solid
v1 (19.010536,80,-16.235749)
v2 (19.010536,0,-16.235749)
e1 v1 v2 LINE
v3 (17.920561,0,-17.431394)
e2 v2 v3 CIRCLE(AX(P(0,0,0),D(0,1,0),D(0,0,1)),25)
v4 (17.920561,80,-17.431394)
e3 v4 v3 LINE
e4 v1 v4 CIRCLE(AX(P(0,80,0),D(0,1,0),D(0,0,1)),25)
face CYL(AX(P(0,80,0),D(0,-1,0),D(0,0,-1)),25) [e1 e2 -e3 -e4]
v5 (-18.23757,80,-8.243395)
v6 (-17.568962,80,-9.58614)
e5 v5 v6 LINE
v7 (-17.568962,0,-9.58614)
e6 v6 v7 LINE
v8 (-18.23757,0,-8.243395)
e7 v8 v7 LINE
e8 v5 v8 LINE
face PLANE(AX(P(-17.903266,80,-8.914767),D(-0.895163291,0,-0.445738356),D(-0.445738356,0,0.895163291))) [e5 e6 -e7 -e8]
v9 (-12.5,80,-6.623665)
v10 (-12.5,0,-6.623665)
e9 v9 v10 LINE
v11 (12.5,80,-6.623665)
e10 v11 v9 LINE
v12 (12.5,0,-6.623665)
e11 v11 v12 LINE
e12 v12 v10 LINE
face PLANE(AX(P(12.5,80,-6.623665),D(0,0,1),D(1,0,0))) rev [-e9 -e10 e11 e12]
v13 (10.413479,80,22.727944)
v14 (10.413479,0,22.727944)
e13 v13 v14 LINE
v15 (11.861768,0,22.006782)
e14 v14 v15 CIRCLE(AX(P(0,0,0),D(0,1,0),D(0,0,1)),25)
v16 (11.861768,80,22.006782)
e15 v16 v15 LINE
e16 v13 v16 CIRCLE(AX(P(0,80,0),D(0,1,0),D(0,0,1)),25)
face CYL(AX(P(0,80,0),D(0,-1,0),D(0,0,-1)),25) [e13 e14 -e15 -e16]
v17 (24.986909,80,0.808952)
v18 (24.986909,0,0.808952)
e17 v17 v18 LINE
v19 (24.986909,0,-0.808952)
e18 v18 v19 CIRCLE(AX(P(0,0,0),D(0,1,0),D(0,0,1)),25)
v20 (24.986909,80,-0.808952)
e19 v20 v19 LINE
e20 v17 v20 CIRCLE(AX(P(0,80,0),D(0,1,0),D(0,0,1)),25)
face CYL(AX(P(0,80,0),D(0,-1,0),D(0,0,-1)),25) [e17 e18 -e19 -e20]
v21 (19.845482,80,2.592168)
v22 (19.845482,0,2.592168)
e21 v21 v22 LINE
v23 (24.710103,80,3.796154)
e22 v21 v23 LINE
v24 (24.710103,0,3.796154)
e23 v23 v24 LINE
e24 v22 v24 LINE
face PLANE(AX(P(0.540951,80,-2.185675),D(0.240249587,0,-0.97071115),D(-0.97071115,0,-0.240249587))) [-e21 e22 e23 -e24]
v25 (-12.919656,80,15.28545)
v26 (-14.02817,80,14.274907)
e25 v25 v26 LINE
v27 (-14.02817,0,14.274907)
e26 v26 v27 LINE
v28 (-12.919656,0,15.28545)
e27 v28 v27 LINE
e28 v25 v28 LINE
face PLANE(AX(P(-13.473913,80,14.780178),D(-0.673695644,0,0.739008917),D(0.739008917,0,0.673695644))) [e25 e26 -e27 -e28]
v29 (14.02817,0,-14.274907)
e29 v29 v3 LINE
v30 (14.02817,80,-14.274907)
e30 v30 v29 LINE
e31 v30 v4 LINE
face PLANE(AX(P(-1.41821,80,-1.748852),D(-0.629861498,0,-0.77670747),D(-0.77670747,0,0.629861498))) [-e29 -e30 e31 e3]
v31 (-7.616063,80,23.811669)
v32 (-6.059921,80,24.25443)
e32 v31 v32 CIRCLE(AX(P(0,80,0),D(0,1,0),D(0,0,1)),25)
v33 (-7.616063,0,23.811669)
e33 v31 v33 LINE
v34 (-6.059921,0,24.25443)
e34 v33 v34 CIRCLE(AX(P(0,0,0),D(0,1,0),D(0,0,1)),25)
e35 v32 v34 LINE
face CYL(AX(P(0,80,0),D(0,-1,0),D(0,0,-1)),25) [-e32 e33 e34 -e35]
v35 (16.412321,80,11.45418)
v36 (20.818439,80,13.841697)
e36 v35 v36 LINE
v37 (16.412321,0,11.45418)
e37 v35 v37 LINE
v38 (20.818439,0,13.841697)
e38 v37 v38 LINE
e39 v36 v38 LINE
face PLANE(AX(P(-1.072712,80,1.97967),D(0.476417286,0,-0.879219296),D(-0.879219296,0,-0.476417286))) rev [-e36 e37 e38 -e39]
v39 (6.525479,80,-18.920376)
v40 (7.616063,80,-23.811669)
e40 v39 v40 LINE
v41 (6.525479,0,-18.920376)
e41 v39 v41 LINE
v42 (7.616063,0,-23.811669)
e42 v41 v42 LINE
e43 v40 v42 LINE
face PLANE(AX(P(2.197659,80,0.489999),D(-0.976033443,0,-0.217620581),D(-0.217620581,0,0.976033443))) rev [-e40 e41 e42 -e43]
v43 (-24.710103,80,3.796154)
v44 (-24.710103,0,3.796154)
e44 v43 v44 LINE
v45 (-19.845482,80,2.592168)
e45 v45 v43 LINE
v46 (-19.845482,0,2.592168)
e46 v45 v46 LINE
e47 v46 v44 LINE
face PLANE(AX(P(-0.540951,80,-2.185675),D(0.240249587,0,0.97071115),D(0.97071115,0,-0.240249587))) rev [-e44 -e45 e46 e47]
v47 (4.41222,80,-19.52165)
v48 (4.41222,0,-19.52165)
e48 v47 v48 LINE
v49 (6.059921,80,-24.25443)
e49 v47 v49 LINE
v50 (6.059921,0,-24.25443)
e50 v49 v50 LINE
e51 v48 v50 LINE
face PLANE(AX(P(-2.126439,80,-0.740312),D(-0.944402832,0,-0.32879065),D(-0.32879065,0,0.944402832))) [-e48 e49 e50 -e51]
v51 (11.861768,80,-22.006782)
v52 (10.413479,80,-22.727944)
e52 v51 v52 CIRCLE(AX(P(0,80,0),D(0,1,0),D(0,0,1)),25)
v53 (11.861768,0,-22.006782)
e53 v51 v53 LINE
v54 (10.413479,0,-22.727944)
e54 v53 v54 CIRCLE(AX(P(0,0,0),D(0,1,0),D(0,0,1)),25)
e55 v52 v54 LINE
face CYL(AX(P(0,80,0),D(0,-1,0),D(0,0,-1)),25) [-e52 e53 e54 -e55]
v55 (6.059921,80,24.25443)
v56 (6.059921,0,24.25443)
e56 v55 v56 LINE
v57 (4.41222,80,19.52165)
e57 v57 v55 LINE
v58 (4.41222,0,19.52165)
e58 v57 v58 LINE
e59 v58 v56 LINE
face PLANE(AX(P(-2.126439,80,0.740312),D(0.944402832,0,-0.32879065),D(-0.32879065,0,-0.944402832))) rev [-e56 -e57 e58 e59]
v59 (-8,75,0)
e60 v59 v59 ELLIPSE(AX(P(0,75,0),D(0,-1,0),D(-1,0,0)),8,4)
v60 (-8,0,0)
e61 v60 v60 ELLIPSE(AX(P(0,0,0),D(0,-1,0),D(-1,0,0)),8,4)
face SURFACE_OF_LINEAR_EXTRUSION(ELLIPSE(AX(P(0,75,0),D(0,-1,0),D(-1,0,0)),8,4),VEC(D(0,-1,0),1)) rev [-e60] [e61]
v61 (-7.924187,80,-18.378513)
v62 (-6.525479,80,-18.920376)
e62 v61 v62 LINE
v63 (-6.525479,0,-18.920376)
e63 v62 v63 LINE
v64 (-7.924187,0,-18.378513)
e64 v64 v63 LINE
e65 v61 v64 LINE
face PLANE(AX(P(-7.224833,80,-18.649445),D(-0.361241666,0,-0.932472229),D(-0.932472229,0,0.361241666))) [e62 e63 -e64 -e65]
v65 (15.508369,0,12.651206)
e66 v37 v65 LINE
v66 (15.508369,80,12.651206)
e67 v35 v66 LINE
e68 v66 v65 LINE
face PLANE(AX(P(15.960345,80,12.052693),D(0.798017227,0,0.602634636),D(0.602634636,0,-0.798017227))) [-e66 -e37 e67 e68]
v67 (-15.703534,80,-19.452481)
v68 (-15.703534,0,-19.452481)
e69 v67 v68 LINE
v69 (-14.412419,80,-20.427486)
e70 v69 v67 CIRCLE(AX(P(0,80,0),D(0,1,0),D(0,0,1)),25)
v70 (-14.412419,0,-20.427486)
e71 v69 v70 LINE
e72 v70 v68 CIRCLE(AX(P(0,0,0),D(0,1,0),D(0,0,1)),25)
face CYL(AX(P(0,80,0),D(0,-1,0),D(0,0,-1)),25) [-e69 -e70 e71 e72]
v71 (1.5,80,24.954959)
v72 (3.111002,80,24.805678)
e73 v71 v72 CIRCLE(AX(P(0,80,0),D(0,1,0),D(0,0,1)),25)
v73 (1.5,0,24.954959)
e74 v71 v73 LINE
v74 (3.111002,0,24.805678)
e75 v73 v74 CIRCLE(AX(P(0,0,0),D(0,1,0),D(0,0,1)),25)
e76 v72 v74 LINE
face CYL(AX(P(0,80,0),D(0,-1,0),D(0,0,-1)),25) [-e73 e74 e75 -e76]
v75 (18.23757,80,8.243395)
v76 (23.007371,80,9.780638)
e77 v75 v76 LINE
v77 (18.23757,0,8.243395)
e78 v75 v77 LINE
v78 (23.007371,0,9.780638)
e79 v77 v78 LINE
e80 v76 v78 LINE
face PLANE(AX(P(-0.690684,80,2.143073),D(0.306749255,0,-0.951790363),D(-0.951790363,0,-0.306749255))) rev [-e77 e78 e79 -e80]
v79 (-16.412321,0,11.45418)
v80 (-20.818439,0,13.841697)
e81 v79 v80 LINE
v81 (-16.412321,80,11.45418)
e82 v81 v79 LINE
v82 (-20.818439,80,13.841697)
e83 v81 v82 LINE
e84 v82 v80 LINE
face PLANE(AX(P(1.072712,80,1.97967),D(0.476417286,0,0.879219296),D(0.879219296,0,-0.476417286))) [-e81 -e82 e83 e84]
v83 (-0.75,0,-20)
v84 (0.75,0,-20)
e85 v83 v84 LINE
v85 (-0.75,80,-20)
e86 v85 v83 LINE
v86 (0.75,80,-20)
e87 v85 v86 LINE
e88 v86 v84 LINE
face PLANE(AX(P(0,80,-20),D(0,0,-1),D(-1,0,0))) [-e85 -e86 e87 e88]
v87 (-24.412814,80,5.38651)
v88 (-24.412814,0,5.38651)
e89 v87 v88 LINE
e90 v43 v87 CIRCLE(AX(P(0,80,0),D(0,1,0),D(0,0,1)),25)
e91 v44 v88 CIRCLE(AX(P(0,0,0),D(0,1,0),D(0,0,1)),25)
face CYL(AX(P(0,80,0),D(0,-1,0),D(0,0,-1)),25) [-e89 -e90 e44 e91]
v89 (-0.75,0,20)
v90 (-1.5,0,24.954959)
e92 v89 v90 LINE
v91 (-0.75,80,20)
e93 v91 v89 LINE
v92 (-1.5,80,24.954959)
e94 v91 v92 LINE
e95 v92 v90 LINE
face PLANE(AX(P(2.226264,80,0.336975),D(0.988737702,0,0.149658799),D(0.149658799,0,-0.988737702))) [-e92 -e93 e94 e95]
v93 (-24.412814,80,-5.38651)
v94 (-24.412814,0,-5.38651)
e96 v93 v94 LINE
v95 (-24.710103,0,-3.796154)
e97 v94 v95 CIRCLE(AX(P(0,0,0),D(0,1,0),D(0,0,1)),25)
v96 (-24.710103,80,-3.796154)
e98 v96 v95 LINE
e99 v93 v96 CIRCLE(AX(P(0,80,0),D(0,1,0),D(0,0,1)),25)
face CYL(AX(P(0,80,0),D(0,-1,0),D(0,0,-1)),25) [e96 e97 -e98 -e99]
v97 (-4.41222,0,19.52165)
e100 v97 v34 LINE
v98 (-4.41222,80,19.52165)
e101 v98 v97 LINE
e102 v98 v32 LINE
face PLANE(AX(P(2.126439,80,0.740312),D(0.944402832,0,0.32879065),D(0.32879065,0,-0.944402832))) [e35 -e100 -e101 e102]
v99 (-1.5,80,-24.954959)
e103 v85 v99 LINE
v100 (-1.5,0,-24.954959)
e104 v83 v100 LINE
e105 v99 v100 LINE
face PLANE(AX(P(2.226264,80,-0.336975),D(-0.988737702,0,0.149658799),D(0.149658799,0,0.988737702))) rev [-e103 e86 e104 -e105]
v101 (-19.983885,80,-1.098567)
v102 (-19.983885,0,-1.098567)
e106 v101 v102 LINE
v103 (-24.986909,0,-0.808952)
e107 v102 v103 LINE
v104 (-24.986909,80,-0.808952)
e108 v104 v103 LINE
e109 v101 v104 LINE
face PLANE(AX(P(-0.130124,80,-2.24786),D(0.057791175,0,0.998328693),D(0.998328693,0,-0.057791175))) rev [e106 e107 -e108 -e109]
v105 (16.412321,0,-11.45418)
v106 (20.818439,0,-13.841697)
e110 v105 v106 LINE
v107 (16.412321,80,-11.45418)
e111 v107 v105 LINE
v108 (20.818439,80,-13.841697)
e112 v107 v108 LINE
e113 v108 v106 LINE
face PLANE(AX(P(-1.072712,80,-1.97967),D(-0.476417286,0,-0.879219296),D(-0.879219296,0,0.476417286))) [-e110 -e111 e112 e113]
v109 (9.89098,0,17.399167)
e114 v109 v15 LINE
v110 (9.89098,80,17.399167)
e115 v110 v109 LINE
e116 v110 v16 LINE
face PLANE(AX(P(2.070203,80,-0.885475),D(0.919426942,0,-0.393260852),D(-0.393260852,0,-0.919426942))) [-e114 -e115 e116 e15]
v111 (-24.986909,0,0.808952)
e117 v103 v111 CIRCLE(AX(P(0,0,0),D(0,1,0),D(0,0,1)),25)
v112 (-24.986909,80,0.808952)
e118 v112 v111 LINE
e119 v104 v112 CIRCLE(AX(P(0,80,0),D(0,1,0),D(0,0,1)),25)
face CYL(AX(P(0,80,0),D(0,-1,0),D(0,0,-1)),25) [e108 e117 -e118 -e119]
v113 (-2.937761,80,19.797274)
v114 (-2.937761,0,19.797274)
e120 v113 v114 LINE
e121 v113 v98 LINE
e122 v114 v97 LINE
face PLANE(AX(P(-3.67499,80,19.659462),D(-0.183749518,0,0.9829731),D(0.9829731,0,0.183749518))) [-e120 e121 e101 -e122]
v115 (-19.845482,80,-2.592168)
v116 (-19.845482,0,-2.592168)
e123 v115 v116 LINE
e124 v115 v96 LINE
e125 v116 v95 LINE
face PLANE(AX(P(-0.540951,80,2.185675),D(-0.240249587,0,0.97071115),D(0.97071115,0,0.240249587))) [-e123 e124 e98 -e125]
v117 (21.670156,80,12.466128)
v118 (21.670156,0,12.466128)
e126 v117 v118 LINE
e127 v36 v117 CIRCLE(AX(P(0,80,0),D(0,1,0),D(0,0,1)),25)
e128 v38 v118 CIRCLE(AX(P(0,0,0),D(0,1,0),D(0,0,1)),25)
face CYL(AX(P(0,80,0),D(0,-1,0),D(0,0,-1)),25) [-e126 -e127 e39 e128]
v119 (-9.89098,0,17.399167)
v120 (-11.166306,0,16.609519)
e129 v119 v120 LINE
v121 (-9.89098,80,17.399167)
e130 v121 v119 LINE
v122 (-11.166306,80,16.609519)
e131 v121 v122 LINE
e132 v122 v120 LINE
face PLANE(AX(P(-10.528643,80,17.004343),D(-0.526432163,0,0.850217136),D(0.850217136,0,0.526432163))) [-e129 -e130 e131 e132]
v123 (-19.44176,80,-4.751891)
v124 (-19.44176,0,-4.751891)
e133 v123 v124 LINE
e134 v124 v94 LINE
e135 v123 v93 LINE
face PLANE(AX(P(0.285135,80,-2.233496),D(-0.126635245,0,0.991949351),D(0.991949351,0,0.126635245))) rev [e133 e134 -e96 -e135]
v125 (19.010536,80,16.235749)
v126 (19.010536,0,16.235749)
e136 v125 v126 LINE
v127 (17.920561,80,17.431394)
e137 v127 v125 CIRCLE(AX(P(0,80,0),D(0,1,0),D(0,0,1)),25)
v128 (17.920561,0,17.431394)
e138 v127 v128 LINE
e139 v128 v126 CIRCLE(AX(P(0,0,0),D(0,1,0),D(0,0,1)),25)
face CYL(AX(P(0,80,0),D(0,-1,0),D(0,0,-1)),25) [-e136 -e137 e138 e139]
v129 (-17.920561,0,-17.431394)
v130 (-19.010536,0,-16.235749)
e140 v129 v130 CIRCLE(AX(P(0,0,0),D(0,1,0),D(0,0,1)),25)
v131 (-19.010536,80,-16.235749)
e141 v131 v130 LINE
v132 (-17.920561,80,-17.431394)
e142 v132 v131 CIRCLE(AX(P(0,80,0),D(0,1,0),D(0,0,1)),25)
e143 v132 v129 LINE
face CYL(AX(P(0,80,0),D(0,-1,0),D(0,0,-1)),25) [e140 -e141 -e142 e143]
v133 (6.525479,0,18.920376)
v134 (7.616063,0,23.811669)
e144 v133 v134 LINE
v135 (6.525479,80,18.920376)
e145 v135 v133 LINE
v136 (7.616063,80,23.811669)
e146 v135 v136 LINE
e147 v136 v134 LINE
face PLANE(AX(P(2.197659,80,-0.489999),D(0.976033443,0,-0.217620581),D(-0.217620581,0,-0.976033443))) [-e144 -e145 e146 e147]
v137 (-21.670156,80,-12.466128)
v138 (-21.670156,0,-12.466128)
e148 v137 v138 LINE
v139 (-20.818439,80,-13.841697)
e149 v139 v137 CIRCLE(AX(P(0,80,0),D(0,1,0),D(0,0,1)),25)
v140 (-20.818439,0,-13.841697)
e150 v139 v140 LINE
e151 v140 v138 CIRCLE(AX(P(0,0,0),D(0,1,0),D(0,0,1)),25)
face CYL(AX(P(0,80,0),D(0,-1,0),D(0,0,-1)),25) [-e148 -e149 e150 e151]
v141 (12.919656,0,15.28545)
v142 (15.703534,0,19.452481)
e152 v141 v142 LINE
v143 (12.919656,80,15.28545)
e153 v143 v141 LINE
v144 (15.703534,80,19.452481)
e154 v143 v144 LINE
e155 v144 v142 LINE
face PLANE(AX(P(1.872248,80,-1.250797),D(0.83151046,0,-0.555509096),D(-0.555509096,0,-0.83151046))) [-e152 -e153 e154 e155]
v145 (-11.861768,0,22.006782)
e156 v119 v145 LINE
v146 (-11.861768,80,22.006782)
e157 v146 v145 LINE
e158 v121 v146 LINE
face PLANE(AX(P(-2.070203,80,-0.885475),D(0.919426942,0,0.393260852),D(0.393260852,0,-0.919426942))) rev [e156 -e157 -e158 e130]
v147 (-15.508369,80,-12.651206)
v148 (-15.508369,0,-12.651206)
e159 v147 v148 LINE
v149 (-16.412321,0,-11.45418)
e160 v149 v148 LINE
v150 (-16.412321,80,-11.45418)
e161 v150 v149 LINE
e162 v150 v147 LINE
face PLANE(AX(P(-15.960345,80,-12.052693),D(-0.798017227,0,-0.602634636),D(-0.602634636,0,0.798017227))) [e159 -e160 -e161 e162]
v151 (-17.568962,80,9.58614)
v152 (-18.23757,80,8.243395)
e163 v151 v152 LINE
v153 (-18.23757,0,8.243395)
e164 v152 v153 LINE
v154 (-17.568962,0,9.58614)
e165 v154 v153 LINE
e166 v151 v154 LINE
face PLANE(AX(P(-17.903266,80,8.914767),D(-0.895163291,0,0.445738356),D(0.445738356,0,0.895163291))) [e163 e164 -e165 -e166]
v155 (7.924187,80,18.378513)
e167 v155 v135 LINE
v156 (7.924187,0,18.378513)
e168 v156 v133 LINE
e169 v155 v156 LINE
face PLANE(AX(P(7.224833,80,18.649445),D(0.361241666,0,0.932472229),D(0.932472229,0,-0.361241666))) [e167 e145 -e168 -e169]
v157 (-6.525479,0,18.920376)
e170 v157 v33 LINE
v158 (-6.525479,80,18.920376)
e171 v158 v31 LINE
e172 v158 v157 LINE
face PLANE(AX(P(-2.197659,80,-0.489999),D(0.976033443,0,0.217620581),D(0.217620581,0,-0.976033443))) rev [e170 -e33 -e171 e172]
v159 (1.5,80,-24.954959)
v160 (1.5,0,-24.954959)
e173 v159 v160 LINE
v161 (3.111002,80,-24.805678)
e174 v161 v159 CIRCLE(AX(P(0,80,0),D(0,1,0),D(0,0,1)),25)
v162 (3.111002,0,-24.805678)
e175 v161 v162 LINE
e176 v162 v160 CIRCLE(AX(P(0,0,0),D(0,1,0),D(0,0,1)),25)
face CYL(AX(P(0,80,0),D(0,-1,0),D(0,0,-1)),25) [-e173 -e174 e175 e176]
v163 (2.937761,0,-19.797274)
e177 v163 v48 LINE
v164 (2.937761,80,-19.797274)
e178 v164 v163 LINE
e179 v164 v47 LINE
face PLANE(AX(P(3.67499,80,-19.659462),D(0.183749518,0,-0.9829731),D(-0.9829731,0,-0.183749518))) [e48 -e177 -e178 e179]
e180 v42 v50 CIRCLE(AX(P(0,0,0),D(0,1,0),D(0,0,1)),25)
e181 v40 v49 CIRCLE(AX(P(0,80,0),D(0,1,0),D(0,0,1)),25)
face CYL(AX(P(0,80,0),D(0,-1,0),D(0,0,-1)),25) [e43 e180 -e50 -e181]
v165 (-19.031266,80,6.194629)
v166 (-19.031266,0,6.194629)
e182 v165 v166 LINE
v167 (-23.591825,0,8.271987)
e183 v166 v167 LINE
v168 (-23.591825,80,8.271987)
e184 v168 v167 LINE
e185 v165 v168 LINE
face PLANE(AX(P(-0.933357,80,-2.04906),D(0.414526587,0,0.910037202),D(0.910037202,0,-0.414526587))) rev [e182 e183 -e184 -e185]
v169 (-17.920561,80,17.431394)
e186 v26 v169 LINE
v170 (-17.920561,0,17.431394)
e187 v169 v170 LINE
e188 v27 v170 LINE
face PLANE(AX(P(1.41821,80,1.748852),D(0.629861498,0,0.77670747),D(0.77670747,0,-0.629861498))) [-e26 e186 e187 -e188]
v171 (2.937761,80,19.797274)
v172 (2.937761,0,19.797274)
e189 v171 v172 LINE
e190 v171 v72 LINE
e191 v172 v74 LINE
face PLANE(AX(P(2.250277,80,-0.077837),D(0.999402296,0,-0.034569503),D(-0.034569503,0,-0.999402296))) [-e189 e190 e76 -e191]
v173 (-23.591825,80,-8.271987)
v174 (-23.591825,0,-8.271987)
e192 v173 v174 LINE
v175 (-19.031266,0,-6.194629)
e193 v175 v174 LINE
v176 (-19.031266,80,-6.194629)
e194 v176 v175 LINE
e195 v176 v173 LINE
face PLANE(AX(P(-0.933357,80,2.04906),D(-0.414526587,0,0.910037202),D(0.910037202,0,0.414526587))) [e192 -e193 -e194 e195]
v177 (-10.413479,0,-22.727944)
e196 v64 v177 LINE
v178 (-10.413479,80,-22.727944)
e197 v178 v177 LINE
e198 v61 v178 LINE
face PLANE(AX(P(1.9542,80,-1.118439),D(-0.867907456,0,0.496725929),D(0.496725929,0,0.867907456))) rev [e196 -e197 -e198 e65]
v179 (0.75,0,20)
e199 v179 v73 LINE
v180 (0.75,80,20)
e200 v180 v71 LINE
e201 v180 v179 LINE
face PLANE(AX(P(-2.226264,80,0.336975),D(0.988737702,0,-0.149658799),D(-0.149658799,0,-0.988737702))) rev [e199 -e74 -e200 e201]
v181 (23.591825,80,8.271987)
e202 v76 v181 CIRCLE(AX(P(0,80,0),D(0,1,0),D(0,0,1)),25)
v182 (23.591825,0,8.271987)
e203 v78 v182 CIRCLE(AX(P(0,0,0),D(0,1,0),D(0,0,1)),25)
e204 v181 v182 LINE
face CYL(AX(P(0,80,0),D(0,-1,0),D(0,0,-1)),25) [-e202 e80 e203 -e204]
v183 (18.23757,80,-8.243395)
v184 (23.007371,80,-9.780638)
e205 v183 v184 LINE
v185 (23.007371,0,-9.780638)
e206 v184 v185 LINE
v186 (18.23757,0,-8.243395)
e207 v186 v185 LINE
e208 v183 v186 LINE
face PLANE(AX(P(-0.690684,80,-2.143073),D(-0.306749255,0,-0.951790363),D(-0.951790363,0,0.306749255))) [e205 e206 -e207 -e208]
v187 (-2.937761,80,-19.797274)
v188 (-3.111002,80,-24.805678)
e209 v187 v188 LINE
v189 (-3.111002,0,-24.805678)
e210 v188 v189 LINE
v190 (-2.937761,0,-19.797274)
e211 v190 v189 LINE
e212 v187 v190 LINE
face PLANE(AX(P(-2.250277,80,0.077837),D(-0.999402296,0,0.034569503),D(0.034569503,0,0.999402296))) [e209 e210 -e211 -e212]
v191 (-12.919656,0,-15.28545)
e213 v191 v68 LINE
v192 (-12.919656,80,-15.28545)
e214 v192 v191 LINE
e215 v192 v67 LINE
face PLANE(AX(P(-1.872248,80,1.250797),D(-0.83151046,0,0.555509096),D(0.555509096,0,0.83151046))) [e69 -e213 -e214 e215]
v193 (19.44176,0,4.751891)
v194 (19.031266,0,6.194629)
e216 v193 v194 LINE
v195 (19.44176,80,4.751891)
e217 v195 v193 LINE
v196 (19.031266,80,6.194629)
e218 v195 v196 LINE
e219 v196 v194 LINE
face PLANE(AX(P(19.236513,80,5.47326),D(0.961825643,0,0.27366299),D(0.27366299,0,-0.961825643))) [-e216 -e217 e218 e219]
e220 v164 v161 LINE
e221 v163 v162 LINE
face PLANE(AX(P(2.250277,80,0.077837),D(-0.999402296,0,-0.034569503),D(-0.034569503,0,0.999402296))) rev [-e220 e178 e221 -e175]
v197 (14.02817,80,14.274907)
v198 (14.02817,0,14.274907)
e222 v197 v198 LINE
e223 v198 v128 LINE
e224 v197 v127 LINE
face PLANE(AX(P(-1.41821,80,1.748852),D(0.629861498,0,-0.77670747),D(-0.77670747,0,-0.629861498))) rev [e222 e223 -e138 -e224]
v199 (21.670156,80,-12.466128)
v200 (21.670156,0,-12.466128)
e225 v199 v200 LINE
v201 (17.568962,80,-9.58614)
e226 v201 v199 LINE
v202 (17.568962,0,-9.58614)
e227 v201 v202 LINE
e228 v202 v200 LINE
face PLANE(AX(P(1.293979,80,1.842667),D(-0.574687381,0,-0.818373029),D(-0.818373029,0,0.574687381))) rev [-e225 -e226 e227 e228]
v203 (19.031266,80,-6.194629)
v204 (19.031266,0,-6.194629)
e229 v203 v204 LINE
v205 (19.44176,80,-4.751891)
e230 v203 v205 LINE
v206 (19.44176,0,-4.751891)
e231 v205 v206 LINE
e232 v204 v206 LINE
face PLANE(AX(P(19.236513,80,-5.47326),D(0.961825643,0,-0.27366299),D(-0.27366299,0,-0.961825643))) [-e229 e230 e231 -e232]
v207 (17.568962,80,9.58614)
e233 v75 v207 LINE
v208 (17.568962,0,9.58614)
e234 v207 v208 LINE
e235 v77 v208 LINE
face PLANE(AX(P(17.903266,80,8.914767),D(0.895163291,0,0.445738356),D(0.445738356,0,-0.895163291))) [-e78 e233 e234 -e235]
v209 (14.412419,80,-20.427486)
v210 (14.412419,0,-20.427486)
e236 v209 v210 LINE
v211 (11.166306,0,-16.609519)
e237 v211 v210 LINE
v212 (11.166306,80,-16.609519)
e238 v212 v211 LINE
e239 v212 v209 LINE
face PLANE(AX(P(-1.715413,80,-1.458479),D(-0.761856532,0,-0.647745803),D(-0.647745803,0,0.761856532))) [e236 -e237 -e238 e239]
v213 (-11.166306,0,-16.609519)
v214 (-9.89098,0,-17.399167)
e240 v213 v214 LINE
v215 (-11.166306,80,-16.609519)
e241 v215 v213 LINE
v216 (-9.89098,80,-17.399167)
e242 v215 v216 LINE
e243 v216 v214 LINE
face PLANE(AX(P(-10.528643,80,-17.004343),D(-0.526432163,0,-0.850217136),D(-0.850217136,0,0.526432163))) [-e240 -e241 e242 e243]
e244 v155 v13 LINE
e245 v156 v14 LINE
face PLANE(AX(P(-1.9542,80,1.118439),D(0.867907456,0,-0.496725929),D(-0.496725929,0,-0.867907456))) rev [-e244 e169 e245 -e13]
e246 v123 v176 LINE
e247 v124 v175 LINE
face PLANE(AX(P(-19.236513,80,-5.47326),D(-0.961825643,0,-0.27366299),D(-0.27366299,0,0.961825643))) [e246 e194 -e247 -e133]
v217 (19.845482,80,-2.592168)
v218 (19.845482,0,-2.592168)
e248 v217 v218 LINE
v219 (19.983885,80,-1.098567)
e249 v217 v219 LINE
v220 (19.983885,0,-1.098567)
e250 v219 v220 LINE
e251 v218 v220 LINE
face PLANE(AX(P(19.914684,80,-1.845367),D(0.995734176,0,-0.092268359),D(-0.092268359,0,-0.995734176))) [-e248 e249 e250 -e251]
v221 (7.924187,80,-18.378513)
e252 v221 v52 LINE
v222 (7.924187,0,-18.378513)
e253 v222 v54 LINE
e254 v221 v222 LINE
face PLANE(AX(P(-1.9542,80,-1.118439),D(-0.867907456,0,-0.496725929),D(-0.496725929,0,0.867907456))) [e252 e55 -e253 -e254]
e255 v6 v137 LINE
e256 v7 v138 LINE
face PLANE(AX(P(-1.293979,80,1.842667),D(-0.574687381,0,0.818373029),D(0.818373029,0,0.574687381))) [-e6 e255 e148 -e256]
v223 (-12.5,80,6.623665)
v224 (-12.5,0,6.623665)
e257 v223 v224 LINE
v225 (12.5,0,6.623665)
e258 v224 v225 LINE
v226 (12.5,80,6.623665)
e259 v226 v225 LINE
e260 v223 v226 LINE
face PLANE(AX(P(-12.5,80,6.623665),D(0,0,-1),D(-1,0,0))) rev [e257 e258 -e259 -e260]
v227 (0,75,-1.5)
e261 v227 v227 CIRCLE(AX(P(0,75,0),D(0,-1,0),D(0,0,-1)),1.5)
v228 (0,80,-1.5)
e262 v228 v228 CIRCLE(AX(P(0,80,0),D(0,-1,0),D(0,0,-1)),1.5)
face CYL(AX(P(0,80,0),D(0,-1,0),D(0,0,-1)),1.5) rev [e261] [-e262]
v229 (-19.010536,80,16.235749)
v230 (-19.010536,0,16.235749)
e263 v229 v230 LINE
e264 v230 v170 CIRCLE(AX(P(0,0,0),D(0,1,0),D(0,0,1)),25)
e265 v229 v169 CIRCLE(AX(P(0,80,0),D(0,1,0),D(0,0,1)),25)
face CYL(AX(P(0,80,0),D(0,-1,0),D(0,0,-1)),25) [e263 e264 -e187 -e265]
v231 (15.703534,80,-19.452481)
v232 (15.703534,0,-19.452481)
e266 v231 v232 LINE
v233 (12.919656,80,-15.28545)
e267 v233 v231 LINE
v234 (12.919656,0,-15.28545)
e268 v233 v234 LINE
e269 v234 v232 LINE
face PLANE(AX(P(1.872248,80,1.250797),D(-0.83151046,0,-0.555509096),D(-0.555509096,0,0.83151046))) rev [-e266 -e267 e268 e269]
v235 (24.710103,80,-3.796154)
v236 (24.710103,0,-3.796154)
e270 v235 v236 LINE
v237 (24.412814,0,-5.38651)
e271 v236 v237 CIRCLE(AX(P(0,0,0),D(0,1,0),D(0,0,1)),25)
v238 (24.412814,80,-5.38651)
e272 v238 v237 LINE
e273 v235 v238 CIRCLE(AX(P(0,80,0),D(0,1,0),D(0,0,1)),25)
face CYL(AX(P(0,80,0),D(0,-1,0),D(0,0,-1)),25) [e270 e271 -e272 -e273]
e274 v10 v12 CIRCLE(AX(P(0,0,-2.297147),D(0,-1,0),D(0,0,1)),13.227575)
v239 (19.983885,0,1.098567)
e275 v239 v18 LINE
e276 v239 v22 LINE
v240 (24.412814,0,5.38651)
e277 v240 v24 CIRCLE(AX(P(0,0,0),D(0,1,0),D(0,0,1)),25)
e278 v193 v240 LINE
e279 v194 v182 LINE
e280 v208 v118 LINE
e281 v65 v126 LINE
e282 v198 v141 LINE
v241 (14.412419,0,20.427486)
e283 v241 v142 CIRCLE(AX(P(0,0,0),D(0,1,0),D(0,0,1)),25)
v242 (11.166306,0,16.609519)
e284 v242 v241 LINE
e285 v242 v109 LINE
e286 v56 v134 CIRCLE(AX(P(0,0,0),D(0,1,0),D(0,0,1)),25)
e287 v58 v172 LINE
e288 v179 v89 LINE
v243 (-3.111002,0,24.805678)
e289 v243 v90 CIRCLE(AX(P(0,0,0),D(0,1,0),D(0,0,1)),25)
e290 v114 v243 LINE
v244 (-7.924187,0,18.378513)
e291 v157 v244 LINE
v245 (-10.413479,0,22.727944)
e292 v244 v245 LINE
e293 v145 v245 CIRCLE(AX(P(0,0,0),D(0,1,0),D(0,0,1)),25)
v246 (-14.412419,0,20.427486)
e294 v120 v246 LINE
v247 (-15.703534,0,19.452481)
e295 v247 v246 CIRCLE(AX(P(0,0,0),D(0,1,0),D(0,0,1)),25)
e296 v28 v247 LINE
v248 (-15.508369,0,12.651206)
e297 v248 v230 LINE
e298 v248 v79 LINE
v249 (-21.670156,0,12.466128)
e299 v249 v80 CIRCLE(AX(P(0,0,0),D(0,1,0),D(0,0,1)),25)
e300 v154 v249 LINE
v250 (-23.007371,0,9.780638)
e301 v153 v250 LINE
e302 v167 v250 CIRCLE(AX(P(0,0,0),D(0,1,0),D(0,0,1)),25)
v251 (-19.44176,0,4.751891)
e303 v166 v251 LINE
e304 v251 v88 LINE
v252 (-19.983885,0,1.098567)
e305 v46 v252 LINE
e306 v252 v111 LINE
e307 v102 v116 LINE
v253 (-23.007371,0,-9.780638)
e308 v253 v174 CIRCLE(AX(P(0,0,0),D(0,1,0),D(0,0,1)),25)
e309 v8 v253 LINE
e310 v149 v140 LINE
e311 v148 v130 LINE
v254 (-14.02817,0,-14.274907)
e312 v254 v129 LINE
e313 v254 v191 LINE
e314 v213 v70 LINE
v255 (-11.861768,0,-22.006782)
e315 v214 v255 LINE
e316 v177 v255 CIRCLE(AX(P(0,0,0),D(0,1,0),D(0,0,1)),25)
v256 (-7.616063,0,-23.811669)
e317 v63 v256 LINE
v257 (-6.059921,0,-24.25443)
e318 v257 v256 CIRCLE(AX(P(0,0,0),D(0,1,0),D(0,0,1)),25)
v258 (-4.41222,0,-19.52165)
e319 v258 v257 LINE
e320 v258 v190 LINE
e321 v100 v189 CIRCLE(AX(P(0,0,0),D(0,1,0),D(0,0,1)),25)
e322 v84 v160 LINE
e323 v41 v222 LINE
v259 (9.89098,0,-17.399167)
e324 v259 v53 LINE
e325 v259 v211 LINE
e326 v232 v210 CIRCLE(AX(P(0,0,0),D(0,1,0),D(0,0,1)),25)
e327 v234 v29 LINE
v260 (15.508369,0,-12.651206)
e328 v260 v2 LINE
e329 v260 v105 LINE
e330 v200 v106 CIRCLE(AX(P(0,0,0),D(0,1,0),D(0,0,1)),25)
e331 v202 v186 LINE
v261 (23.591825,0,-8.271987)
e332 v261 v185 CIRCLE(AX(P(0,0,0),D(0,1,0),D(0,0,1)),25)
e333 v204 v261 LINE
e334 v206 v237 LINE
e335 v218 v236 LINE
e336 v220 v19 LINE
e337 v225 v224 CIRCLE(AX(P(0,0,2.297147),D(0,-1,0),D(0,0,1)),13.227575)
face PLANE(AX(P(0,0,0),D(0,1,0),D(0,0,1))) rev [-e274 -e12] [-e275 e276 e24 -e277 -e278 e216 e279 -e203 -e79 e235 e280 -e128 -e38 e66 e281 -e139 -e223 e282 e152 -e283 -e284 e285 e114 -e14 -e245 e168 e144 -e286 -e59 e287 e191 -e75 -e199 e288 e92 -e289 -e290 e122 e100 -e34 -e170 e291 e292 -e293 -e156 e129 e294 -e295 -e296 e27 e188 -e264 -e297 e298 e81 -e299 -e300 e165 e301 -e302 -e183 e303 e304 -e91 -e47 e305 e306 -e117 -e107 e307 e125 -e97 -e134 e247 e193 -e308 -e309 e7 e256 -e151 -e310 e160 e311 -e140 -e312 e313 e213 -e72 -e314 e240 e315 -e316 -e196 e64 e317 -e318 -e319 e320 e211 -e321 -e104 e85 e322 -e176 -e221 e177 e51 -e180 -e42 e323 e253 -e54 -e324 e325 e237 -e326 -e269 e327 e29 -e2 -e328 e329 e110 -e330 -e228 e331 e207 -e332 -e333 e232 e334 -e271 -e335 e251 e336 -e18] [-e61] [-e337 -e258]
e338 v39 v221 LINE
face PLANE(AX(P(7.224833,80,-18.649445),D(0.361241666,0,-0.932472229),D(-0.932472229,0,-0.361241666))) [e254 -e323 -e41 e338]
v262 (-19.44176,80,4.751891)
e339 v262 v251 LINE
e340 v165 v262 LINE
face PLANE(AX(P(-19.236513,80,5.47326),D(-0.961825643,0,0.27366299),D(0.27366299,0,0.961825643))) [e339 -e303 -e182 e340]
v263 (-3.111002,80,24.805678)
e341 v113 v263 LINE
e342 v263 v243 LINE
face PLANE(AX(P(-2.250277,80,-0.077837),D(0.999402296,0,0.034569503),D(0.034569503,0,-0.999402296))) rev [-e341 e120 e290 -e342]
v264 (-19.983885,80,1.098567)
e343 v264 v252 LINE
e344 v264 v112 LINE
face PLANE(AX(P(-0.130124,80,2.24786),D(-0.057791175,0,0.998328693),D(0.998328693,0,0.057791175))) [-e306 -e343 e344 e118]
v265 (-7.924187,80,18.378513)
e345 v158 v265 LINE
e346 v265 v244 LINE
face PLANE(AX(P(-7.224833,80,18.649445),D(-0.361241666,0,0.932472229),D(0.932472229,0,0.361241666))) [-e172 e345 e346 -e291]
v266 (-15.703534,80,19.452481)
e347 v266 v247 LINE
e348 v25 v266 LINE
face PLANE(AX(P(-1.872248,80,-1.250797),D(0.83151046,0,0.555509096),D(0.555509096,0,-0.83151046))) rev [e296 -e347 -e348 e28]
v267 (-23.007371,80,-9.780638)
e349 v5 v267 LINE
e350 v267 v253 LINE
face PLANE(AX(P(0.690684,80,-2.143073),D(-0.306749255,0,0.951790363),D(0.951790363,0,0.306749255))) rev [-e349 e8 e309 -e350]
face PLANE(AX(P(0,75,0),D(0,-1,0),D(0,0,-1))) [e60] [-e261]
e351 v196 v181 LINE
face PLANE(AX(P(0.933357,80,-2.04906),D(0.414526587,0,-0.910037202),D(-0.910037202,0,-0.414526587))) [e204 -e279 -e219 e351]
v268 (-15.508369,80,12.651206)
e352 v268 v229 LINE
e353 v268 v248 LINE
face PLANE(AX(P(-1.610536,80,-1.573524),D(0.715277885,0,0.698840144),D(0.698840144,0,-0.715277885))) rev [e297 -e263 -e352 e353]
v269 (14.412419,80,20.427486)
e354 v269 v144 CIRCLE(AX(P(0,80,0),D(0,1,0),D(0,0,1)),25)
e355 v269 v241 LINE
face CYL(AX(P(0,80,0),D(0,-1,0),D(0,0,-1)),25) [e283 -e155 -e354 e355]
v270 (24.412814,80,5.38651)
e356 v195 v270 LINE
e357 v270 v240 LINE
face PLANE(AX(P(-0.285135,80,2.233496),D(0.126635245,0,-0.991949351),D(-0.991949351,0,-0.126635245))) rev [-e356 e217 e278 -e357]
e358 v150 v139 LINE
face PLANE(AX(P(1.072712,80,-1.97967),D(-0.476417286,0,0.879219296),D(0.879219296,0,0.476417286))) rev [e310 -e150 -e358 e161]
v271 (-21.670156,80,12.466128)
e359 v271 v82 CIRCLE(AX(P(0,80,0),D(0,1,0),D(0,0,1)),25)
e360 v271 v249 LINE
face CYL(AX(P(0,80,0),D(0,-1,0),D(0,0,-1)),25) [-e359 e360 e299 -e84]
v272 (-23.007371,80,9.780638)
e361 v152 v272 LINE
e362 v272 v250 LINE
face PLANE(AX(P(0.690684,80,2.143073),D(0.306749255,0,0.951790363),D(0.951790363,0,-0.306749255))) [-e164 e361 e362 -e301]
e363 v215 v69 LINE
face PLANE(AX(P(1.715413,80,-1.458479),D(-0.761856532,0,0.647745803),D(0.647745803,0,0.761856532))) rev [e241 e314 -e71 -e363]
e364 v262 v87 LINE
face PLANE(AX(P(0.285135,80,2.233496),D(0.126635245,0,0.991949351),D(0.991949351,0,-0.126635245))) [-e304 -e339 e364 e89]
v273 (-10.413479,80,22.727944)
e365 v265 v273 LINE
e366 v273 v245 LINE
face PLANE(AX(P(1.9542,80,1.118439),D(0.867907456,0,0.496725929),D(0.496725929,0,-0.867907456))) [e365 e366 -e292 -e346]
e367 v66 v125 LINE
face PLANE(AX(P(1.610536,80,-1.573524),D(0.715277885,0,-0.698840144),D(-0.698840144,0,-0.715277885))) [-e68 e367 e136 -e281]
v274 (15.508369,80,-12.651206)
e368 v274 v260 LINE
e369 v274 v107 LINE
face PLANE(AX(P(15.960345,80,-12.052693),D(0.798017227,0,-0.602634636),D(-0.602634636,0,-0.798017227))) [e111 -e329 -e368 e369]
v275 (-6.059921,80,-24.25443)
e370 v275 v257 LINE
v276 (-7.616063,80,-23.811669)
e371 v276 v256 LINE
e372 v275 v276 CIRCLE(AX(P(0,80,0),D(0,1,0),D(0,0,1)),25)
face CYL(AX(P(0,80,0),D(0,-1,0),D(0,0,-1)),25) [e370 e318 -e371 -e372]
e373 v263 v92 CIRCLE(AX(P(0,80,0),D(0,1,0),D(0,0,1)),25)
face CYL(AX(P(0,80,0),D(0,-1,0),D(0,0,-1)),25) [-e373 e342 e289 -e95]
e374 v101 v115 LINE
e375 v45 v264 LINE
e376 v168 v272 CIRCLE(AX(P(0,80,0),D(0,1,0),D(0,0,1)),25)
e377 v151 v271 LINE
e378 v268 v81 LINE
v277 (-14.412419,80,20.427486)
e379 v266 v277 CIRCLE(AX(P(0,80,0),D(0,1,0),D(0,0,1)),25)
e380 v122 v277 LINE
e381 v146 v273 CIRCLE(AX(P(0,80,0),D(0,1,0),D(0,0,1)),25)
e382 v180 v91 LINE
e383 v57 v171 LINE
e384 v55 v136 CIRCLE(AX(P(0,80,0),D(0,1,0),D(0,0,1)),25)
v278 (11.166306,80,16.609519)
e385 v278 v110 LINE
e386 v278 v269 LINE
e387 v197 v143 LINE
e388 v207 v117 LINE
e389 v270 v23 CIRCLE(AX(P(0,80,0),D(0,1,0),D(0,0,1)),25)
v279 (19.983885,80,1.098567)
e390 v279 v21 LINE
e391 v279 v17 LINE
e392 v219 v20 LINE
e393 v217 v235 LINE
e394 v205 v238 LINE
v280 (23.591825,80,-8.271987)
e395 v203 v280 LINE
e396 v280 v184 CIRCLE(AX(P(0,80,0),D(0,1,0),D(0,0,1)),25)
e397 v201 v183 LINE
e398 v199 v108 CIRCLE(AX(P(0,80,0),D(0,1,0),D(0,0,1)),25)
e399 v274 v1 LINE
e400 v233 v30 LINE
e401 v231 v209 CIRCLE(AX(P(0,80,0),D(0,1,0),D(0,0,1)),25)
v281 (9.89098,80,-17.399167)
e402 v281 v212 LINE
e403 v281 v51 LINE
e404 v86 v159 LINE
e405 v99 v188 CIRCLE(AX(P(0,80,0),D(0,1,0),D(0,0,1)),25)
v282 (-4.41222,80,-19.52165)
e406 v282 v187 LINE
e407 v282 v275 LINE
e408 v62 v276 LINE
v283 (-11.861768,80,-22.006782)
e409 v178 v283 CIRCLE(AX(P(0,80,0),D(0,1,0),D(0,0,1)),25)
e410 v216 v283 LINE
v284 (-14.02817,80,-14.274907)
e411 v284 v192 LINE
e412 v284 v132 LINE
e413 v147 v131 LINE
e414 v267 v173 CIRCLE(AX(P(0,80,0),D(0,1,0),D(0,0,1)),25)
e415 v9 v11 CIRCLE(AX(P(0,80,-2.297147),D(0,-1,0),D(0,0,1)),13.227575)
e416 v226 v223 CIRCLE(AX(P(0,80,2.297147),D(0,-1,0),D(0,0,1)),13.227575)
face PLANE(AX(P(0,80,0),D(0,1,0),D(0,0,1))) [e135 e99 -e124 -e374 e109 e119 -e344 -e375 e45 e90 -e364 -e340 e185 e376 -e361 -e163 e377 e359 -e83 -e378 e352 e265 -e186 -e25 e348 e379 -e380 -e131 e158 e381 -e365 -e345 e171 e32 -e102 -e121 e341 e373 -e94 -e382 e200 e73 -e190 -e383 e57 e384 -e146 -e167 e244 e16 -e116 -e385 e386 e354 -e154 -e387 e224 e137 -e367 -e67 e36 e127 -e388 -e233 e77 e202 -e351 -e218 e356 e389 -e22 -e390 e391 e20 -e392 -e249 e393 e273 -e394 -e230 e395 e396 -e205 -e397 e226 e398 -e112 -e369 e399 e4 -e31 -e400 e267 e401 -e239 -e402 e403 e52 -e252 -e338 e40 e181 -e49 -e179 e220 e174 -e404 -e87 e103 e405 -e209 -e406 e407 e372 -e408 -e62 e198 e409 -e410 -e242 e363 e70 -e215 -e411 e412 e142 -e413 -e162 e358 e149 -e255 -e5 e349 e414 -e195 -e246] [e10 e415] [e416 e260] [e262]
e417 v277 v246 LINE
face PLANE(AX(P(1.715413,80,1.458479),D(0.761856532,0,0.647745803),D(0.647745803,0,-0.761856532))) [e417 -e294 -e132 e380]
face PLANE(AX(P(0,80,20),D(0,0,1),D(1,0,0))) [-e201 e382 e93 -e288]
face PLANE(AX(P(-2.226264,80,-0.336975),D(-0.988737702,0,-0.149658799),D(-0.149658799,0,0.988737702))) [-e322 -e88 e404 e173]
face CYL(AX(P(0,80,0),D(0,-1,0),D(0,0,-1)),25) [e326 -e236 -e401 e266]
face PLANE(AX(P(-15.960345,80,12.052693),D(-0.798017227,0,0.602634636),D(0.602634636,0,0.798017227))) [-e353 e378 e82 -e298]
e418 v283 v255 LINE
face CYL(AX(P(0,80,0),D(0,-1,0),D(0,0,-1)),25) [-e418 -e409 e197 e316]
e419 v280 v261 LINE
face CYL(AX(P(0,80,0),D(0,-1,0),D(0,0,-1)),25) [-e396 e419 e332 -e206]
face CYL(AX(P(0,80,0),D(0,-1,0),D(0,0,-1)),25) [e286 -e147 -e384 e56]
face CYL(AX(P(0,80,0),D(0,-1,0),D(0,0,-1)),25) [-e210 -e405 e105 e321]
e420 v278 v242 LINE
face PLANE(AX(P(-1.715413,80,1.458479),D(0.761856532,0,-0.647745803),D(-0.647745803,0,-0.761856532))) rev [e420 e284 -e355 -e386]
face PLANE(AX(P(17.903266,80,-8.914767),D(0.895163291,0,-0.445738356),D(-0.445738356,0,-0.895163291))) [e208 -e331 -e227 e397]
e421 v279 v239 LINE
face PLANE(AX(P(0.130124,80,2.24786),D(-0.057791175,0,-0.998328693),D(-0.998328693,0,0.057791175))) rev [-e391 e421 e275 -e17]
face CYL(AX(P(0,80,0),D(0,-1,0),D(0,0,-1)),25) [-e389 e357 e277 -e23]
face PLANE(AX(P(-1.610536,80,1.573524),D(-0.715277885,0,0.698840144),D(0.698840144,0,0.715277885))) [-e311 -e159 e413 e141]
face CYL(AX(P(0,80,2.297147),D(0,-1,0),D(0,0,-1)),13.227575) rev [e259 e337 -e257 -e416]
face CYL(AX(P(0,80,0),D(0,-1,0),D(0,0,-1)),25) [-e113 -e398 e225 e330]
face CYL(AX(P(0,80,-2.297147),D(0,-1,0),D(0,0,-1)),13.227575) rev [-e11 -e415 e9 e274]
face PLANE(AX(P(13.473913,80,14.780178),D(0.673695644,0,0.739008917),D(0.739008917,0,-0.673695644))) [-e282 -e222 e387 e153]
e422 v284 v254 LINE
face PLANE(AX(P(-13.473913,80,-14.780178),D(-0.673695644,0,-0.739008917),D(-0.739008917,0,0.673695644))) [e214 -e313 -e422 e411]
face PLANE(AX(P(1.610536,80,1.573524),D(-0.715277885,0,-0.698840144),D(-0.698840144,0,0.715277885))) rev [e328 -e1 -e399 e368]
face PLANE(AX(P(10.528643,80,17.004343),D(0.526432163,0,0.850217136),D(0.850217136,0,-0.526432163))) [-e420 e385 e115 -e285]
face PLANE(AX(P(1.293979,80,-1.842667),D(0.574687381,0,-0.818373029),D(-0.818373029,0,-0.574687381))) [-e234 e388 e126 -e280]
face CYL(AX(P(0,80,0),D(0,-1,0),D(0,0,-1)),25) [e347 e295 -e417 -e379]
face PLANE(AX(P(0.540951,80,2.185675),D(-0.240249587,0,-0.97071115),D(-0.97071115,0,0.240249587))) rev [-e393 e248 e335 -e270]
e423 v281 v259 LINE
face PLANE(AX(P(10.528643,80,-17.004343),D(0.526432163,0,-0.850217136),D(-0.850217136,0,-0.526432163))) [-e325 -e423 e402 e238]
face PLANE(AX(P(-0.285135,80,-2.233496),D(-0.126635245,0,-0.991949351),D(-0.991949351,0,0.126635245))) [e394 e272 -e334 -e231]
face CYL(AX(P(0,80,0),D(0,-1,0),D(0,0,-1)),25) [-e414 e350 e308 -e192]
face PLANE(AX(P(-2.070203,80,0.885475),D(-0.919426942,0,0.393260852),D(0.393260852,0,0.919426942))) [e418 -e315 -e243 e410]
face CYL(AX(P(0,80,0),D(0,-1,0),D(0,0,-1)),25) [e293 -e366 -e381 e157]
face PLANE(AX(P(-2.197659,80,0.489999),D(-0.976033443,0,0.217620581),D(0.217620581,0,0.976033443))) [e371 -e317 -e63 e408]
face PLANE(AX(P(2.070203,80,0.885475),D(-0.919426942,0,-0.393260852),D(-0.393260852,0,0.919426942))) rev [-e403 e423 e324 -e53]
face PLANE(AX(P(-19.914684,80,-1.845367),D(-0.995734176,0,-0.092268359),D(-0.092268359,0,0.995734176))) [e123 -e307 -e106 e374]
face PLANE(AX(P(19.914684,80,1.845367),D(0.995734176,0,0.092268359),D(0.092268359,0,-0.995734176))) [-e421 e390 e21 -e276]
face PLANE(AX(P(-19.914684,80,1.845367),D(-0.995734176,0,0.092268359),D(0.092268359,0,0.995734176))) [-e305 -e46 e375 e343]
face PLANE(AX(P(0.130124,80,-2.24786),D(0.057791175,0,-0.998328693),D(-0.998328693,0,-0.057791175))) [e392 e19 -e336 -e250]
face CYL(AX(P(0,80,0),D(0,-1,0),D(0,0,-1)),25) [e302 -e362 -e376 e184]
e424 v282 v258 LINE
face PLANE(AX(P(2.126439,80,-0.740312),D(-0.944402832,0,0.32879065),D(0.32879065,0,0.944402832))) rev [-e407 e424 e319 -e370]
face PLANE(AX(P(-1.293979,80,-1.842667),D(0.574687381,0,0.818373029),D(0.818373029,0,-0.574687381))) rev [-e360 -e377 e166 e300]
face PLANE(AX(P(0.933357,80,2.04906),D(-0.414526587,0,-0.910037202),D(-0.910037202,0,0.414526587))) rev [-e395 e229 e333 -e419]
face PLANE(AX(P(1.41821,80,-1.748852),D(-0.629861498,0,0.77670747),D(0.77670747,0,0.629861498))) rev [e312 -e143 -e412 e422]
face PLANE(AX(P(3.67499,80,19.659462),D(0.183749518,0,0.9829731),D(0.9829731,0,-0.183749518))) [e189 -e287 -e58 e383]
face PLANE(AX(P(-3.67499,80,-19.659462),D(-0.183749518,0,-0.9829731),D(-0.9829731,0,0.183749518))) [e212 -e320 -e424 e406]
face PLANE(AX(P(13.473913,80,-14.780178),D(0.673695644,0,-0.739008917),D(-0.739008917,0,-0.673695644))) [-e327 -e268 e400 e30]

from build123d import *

# Parameters (mm, degrees)
BOSS_EXTRUDE2_DEPTH = 80
CUT_EXTRUDE3_DEPTH  = 88.451415083
SKETCH6_RX          = 8
SKETCH6_RY          = 4
CUT_EXTRUDE4_DEPTH  = 75
SKETCH7_R           = 1.5
CUT_EXTRUDE5_DEPTH  = 83.902050638


# Read off the part's stored shape, not the designer's step: Boss-Extrude2
with BuildPart() as part:
    # Boss-Extrude2 outline → Boss-Extrude2 (new body)
    with BuildSketch(Plane(origin=(0, 0, 0), x_dir=(1, 0, 0), z_dir=(0, 1, 0))):
        with BuildLine():
            Line((1.5, 24.954959427), (0.75, 20))
            Line((0.75, 20), (-0.75, 20))
            Line((-0.75, 20), (-1.5, 24.954959427))
            ThreePointArc((-1.5, 24.954959427), (-2.306708986, 24.893354407), (-3.111002112, 24.805678097))
            Line((-3.111002112, 24.805678097), (-2.937760532, 19.797274132))
            Line((-2.937760532, 19.797274132), (-4.412220181, 19.521649855))
            Line((-4.412220181, 19.521649855), (-6.059921411, 24.254429544))
            ThreePointArc((-6.059921411, 24.254429544), (-6.841574752, 24.045641079), (-7.616062779, 23.811669151))
            Line((-7.616062779, 23.811669151), (-6.525479152, 18.920375838))
            Line((-6.525479152, 18.920375838), (-7.924187496, 18.378513338))
            Line((-7.924187496, 18.378513338), (-10.413479467, 22.727944152))
            ThreePointArc((-10.413479467, 22.727944152), (-11.143458894, 22.379082284), (-11.861767562, 22.006782371))
            Line((-11.861767562, 22.006782371), (-9.890980406, 17.399166837))
            Line((-9.890980406, 17.399166837), (-11.166306109, 16.609518592))
            Line((-11.166306109, 16.609518592), (-14.412418969, 20.427485882))
            ThreePointArc((-14.412418969, 20.427485882), (-15.065865909, 19.950430682), (-15.703534077, 19.452481011))
            Line((-15.703534077, 19.452481011), (-12.919656185, 15.285450077))
            Line((-12.919656185, 15.285450077), (-14.028169561, 14.274906612))
            Line((-14.028169561, 14.274906612), (-17.920560829, 17.43139408))
            ThreePointArc((-17.920560829, 17.43139408), (-18.475222931, 16.842391091), (-19.010535574, 16.235748741))
            Line((-19.010535574, 16.235748741), (-15.508368568, 12.651205648))
            Line((-15.508368568, 12.651205648), (-16.412320523, 11.454179807))
            Line((-16.412320523, 11.454179807), (-20.818439483, 13.841697059))
            ThreePointArc((-20.818439483, 13.841697059), (-21.255428393, 13.160804072), (-21.670156083, 12.46612752))
            Line((-21.670156083, 12.46612752), (-17.56896206, 9.586139584))
            Line((-17.56896206, 9.586139584), (-18.237569594, 8.243394647))
            Line((-18.237569594, 8.243394647), (-23.00737115, 9.780637646))
            ThreePointArc((-23.00737115, 9.780637646), (-23.311805735, 9.031041655), (-23.591825416, 8.271987279))
            Line((-23.591825416, 8.271987279), (-19.031265621, 6.194629034))
            Line((-19.031265621, 6.194629034), (-19.441760106, 4.751890569))
            Line((-19.441760106, 4.751890569), (-24.412814386, 5.386510349))
            ThreePointArc((-24.412814386, 5.386510349), (-24.574327492, 4.593737945), (-24.71010343, 3.796154431))
            Line((-24.71010343, 3.796154431), (-19.845482256, 2.592167821))
            Line((-19.845482256, 2.592167821), (-19.983884795, 1.098566557))
            Line((-19.983884795, 1.098566557), (-24.986908509, 0.808951902))
            ThreePointArc((-24.986908509, 0.808951902), (-25, 0), (-24.986908509, -0.808951902))
            Line((-24.986908509, -0.808951902), (-19.983884795, -1.098566557))
            Line((-19.983884795, -1.098566557), (-19.845482256, -2.592167821))
            Line((-19.845482256, -2.592167821), (-24.71010343, -3.796154431))
            ThreePointArc((-24.71010343, -3.796154431), (-24.574327492, -4.593737945), (-24.412814386, -5.386510349))
            Line((-24.412814386, -5.386510349), (-19.441760106, -4.751890569))
            Line((-19.441760106, -4.751890569), (-19.031265621, -6.194629034))
            Line((-19.031265621, -6.194629034), (-23.591825416, -8.271987279))
            ThreePointArc((-23.591825416, -8.271987279), (-23.311805735, -9.031041655), (-23.00737115, -9.780637646))
            Line((-23.00737115, -9.780637646), (-18.237569594, -8.243394647))
            Line((-18.237569594, -8.243394647), (-17.56896206, -9.586139584))
            Line((-17.56896206, -9.586139584), (-21.670156083, -12.46612752))
            ThreePointArc((-21.670156083, -12.46612752), (-21.255428393, -13.160804072), (-20.818439483, -13.841697059))
            Line((-20.818439483, -13.841697059), (-16.412320523, -11.454179807))
            Line((-16.412320523, -11.454179807), (-15.508368568, -12.651205648))
            Line((-15.508368568, -12.651205648), (-19.010535574, -16.235748741))
            ThreePointArc((-19.010535574, -16.235748741), (-18.475222931, -16.842391091), (-17.920560829, -17.43139408))
            Line((-17.920560829, -17.43139408), (-14.028169561, -14.274906612))
            Line((-14.028169561, -14.274906612), (-12.919656185, -15.285450077))
            Line((-12.919656185, -15.285450077), (-15.703534077, -19.452481011))
            ThreePointArc((-15.703534077, -19.452481011), (-15.065865909, -19.950430682), (-14.412418969, -20.427485882))
            Line((-14.412418969, -20.427485882), (-11.166306109, -16.609518592))
            Line((-11.166306109, -16.609518592), (-9.890980406, -17.399166837))
            Line((-9.890980406, -17.399166837), (-11.861767562, -22.006782371))
            ThreePointArc((-11.861767562, -22.006782371), (-11.143458894, -22.379082284), (-10.413479467, -22.727944152))
            Line((-10.413479467, -22.727944152), (-7.924187496, -18.378513338))
            Line((-7.924187496, -18.378513338), (-6.525479152, -18.920375838))
            Line((-6.525479152, -18.920375838), (-7.616062779, -23.811669151))
            ThreePointArc((-7.616062779, -23.811669151), (-6.841574752, -24.045641079), (-6.059921411, -24.254429544))
            Line((-6.059921411, -24.254429544), (-4.412220181, -19.521649855))
            Line((-4.412220181, -19.521649855), (-2.937760532, -19.797274132))
            Line((-2.937760532, -19.797274132), (-3.111002112, -24.805678097))
            ThreePointArc((-3.111002112, -24.805678097), (-2.306708986, -24.893354407), (-1.5, -24.954959427))
            Line((-1.5, -24.954959427), (-0.75, -20))
            Line((-0.75, -20), (0.75, -20))
            Line((0.75, -20), (1.5, -24.954959427))
            ThreePointArc((1.5, -24.954959427), (2.306708986, -24.893354407), (3.111002112, -24.805678097))
            Line((3.111002112, -24.805678097), (2.937760532, -19.797274132))
            Line((2.937760532, -19.797274132), (4.412220181, -19.521649855))
            Line((4.412220181, -19.521649855), (6.059921411, -24.254429544))
            ThreePointArc((6.059921411, -24.254429544), (6.841574752, -24.045641079), (7.616062779, -23.811669151))
            Line((7.616062779, -23.811669151), (6.525479152, -18.920375838))
            Line((6.525479152, -18.920375838), (7.924187496, -18.378513338))
            Line((7.924187496, -18.378513338), (10.413479467, -22.727944152))
            ThreePointArc((10.413479467, -22.727944152), (11.143458894, -22.379082284), (11.861767562, -22.006782371))
            Line((11.861767562, -22.006782371), (9.890980406, -17.399166837))
            Line((9.890980406, -17.399166837), (11.166306109, -16.609518592))
            Line((11.166306109, -16.609518592), (14.412418969, -20.427485882))
            ThreePointArc((14.412418969, -20.427485882), (15.065865909, -19.950430682), (15.703534077, -19.452481011))
            Line((15.703534077, -19.452481011), (12.919656185, -15.285450077))
            Line((12.919656185, -15.285450077), (14.028169561, -14.274906612))
            Line((14.028169561, -14.274906612), (17.920560829, -17.43139408))
            ThreePointArc((17.920560829, -17.43139408), (18.475222931, -16.842391091), (19.010535574, -16.235748741))
            Line((19.010535574, -16.235748741), (15.508368568, -12.651205648))
            Line((15.508368568, -12.651205648), (16.412320523, -11.454179807))
            Line((16.412320523, -11.454179807), (20.818439483, -13.841697059))
            ThreePointArc((20.818439483, -13.841697059), (21.255428393, -13.160804072), (21.670156083, -12.46612752))
            Line((21.670156083, -12.46612752), (17.56896206, -9.586139584))
            Line((17.56896206, -9.586139584), (18.237569594, -8.243394647))
            Line((18.237569594, -8.243394647), (23.00737115, -9.780637646))
            ThreePointArc((23.00737115, -9.780637646), (23.311805735, -9.031041655), (23.591825416, -8.271987279))
            Line((23.591825416, -8.271987279), (19.031265621, -6.194629034))
            Line((19.031265621, -6.194629034), (19.441760106, -4.751890569))
            Line((19.441760106, -4.751890569), (24.412814386, -5.386510349))
            ThreePointArc((24.412814386, -5.386510349), (24.574327492, -4.593737945), (24.71010343, -3.796154431))
            Line((24.71010343, -3.796154431), (19.845482256, -2.592167821))
            Line((19.845482256, -2.592167821), (19.983884796, -1.098566557))
            Line((19.983884796, -1.098566557), (24.986908509, -0.808951902))
            ThreePointArc((24.986908509, -0.808951902), (25, 0), (24.986908509, 0.808951902))
            Line((24.986908509, 0.808951902), (19.983884796, 1.098566557))
            Line((19.983884796, 1.098566557), (19.845482256, 2.592167821))
            Line((19.845482256, 2.592167821), (24.71010343, 3.796154431))
            ThreePointArc((24.71010343, 3.796154431), (24.574327492, 4.593737945), (24.412814386, 5.386510349))
            Line((24.412814386, 5.386510349), (19.441760106, 4.751890569))
            Line((19.441760106, 4.751890569), (19.031265621, 6.194629034))
            Line((19.031265621, 6.194629034), (23.591825416, 8.271987279))
            ThreePointArc((23.591825416, 8.271987279), (23.311805735, 9.031041655), (23.00737115, 9.780637646))
            Line((23.00737115, 9.780637646), (18.237569594, 8.243394647))
            Line((18.237569594, 8.243394647), (17.56896206, 9.586139584))
            Line((17.56896206, 9.586139584), (21.670156083, 12.46612752))
            ThreePointArc((21.670156083, 12.46612752), (21.255428393, 13.160804072), (20.818439483, 13.841697059))
            Line((20.818439483, 13.841697059), (16.412320523, 11.454179807))
            Line((16.412320523, 11.454179807), (15.508368568, 12.651205648))
            Line((15.508368568, 12.651205648), (19.010535574, 16.235748741))
            ThreePointArc((19.010535574, 16.235748741), (18.475222931, 16.842391091), (17.920560829, 17.43139408))
            Line((17.920560829, 17.43139408), (14.028169561, 14.274906612))
            Line((14.028169561, 14.274906612), (12.919656185, 15.285450077))
            Line((12.919656185, 15.285450077), (15.703534077, 19.452481011))
            ThreePointArc((15.703534077, 19.452481011), (15.065865909, 19.950430682), (14.412418969, 20.427485882))
            Line((14.412418969, 20.427485882), (11.166306109, 16.609518592))
            Line((11.166306109, 16.609518592), (9.890980406, 17.399166837))
            Line((9.890980406, 17.399166837), (11.861767562, 22.006782371))
            ThreePointArc((11.861767562, 22.006782371), (11.143458894, 22.379082284), (10.413479467, 22.727944152))
            Line((10.413479467, 22.727944152), (7.924187496, 18.378513338))
            Line((7.924187496, 18.378513338), (6.525479152, 18.920375838))
            Line((6.525479152, 18.920375838), (7.616062779, 23.811669151))
            ThreePointArc((7.616062779, 23.811669151), (6.841574752, 24.045641079), (6.059921411, 24.254429544))
            Line((6.059921411, 24.254429544), (4.412220181, 19.521649855))
            Line((4.412220181, 19.521649855), (2.937760532, 19.797274132))
            Line((2.937760532, 19.797274132), (3.111002112, 24.805678097))
            ThreePointArc((3.111002112, 24.805678097), (2.306708986, 24.893354407), (1.5, 24.954959427))
        make_face()
    extrude(amount=BOSS_EXTRUDE2_DEPTH)

    # Sketch5 → Cut-Extrude3 (cut, through all)
    with BuildSketch(Plane.XZ):
        with BuildLine():
            Line((-12.5, 6.623664739), (12.5, 6.623664739))
            ThreePointArc((12.5, 6.623664739), (0, 15.524722913), (-12.5, 6.623664739))
        make_face()
        with BuildLine():
            Line((12.5, -6.623664739), (-12.5, -6.623664739))
            ThreePointArc((-12.5, -6.623664739), (0, -15.524722913), (12.5, -6.623664739))
        make_face()
    extrude(amount=-CUT_EXTRUDE3_DEPTH, mode=Mode.SUBTRACT)

    # Sketch6 → Cut-Extrude4 (cut)
    with BuildSketch(Plane(origin=(0, 0, 0), x_dir=(-1, 0, 0), z_dir=(0, -1, 0))):
        with Locations((0, 0)):
            Ellipse(SKETCH6_RX, SKETCH6_RY)
    extrude(amount=-CUT_EXTRUDE4_DEPTH, mode=Mode.SUBTRACT)

    # Sketch7 → Cut-Extrude5 (cut, through all)
    with BuildSketch(Plane.XZ.offset(-75)):
        with Locations(Location((0, 0, 0), (0, 0, 270))):
            Circle(SKETCH7_R)
    extrude(amount=-CUT_EXTRUDE5_DEPTH, mode=Mode.SUBTRACT)


solid = part.part
